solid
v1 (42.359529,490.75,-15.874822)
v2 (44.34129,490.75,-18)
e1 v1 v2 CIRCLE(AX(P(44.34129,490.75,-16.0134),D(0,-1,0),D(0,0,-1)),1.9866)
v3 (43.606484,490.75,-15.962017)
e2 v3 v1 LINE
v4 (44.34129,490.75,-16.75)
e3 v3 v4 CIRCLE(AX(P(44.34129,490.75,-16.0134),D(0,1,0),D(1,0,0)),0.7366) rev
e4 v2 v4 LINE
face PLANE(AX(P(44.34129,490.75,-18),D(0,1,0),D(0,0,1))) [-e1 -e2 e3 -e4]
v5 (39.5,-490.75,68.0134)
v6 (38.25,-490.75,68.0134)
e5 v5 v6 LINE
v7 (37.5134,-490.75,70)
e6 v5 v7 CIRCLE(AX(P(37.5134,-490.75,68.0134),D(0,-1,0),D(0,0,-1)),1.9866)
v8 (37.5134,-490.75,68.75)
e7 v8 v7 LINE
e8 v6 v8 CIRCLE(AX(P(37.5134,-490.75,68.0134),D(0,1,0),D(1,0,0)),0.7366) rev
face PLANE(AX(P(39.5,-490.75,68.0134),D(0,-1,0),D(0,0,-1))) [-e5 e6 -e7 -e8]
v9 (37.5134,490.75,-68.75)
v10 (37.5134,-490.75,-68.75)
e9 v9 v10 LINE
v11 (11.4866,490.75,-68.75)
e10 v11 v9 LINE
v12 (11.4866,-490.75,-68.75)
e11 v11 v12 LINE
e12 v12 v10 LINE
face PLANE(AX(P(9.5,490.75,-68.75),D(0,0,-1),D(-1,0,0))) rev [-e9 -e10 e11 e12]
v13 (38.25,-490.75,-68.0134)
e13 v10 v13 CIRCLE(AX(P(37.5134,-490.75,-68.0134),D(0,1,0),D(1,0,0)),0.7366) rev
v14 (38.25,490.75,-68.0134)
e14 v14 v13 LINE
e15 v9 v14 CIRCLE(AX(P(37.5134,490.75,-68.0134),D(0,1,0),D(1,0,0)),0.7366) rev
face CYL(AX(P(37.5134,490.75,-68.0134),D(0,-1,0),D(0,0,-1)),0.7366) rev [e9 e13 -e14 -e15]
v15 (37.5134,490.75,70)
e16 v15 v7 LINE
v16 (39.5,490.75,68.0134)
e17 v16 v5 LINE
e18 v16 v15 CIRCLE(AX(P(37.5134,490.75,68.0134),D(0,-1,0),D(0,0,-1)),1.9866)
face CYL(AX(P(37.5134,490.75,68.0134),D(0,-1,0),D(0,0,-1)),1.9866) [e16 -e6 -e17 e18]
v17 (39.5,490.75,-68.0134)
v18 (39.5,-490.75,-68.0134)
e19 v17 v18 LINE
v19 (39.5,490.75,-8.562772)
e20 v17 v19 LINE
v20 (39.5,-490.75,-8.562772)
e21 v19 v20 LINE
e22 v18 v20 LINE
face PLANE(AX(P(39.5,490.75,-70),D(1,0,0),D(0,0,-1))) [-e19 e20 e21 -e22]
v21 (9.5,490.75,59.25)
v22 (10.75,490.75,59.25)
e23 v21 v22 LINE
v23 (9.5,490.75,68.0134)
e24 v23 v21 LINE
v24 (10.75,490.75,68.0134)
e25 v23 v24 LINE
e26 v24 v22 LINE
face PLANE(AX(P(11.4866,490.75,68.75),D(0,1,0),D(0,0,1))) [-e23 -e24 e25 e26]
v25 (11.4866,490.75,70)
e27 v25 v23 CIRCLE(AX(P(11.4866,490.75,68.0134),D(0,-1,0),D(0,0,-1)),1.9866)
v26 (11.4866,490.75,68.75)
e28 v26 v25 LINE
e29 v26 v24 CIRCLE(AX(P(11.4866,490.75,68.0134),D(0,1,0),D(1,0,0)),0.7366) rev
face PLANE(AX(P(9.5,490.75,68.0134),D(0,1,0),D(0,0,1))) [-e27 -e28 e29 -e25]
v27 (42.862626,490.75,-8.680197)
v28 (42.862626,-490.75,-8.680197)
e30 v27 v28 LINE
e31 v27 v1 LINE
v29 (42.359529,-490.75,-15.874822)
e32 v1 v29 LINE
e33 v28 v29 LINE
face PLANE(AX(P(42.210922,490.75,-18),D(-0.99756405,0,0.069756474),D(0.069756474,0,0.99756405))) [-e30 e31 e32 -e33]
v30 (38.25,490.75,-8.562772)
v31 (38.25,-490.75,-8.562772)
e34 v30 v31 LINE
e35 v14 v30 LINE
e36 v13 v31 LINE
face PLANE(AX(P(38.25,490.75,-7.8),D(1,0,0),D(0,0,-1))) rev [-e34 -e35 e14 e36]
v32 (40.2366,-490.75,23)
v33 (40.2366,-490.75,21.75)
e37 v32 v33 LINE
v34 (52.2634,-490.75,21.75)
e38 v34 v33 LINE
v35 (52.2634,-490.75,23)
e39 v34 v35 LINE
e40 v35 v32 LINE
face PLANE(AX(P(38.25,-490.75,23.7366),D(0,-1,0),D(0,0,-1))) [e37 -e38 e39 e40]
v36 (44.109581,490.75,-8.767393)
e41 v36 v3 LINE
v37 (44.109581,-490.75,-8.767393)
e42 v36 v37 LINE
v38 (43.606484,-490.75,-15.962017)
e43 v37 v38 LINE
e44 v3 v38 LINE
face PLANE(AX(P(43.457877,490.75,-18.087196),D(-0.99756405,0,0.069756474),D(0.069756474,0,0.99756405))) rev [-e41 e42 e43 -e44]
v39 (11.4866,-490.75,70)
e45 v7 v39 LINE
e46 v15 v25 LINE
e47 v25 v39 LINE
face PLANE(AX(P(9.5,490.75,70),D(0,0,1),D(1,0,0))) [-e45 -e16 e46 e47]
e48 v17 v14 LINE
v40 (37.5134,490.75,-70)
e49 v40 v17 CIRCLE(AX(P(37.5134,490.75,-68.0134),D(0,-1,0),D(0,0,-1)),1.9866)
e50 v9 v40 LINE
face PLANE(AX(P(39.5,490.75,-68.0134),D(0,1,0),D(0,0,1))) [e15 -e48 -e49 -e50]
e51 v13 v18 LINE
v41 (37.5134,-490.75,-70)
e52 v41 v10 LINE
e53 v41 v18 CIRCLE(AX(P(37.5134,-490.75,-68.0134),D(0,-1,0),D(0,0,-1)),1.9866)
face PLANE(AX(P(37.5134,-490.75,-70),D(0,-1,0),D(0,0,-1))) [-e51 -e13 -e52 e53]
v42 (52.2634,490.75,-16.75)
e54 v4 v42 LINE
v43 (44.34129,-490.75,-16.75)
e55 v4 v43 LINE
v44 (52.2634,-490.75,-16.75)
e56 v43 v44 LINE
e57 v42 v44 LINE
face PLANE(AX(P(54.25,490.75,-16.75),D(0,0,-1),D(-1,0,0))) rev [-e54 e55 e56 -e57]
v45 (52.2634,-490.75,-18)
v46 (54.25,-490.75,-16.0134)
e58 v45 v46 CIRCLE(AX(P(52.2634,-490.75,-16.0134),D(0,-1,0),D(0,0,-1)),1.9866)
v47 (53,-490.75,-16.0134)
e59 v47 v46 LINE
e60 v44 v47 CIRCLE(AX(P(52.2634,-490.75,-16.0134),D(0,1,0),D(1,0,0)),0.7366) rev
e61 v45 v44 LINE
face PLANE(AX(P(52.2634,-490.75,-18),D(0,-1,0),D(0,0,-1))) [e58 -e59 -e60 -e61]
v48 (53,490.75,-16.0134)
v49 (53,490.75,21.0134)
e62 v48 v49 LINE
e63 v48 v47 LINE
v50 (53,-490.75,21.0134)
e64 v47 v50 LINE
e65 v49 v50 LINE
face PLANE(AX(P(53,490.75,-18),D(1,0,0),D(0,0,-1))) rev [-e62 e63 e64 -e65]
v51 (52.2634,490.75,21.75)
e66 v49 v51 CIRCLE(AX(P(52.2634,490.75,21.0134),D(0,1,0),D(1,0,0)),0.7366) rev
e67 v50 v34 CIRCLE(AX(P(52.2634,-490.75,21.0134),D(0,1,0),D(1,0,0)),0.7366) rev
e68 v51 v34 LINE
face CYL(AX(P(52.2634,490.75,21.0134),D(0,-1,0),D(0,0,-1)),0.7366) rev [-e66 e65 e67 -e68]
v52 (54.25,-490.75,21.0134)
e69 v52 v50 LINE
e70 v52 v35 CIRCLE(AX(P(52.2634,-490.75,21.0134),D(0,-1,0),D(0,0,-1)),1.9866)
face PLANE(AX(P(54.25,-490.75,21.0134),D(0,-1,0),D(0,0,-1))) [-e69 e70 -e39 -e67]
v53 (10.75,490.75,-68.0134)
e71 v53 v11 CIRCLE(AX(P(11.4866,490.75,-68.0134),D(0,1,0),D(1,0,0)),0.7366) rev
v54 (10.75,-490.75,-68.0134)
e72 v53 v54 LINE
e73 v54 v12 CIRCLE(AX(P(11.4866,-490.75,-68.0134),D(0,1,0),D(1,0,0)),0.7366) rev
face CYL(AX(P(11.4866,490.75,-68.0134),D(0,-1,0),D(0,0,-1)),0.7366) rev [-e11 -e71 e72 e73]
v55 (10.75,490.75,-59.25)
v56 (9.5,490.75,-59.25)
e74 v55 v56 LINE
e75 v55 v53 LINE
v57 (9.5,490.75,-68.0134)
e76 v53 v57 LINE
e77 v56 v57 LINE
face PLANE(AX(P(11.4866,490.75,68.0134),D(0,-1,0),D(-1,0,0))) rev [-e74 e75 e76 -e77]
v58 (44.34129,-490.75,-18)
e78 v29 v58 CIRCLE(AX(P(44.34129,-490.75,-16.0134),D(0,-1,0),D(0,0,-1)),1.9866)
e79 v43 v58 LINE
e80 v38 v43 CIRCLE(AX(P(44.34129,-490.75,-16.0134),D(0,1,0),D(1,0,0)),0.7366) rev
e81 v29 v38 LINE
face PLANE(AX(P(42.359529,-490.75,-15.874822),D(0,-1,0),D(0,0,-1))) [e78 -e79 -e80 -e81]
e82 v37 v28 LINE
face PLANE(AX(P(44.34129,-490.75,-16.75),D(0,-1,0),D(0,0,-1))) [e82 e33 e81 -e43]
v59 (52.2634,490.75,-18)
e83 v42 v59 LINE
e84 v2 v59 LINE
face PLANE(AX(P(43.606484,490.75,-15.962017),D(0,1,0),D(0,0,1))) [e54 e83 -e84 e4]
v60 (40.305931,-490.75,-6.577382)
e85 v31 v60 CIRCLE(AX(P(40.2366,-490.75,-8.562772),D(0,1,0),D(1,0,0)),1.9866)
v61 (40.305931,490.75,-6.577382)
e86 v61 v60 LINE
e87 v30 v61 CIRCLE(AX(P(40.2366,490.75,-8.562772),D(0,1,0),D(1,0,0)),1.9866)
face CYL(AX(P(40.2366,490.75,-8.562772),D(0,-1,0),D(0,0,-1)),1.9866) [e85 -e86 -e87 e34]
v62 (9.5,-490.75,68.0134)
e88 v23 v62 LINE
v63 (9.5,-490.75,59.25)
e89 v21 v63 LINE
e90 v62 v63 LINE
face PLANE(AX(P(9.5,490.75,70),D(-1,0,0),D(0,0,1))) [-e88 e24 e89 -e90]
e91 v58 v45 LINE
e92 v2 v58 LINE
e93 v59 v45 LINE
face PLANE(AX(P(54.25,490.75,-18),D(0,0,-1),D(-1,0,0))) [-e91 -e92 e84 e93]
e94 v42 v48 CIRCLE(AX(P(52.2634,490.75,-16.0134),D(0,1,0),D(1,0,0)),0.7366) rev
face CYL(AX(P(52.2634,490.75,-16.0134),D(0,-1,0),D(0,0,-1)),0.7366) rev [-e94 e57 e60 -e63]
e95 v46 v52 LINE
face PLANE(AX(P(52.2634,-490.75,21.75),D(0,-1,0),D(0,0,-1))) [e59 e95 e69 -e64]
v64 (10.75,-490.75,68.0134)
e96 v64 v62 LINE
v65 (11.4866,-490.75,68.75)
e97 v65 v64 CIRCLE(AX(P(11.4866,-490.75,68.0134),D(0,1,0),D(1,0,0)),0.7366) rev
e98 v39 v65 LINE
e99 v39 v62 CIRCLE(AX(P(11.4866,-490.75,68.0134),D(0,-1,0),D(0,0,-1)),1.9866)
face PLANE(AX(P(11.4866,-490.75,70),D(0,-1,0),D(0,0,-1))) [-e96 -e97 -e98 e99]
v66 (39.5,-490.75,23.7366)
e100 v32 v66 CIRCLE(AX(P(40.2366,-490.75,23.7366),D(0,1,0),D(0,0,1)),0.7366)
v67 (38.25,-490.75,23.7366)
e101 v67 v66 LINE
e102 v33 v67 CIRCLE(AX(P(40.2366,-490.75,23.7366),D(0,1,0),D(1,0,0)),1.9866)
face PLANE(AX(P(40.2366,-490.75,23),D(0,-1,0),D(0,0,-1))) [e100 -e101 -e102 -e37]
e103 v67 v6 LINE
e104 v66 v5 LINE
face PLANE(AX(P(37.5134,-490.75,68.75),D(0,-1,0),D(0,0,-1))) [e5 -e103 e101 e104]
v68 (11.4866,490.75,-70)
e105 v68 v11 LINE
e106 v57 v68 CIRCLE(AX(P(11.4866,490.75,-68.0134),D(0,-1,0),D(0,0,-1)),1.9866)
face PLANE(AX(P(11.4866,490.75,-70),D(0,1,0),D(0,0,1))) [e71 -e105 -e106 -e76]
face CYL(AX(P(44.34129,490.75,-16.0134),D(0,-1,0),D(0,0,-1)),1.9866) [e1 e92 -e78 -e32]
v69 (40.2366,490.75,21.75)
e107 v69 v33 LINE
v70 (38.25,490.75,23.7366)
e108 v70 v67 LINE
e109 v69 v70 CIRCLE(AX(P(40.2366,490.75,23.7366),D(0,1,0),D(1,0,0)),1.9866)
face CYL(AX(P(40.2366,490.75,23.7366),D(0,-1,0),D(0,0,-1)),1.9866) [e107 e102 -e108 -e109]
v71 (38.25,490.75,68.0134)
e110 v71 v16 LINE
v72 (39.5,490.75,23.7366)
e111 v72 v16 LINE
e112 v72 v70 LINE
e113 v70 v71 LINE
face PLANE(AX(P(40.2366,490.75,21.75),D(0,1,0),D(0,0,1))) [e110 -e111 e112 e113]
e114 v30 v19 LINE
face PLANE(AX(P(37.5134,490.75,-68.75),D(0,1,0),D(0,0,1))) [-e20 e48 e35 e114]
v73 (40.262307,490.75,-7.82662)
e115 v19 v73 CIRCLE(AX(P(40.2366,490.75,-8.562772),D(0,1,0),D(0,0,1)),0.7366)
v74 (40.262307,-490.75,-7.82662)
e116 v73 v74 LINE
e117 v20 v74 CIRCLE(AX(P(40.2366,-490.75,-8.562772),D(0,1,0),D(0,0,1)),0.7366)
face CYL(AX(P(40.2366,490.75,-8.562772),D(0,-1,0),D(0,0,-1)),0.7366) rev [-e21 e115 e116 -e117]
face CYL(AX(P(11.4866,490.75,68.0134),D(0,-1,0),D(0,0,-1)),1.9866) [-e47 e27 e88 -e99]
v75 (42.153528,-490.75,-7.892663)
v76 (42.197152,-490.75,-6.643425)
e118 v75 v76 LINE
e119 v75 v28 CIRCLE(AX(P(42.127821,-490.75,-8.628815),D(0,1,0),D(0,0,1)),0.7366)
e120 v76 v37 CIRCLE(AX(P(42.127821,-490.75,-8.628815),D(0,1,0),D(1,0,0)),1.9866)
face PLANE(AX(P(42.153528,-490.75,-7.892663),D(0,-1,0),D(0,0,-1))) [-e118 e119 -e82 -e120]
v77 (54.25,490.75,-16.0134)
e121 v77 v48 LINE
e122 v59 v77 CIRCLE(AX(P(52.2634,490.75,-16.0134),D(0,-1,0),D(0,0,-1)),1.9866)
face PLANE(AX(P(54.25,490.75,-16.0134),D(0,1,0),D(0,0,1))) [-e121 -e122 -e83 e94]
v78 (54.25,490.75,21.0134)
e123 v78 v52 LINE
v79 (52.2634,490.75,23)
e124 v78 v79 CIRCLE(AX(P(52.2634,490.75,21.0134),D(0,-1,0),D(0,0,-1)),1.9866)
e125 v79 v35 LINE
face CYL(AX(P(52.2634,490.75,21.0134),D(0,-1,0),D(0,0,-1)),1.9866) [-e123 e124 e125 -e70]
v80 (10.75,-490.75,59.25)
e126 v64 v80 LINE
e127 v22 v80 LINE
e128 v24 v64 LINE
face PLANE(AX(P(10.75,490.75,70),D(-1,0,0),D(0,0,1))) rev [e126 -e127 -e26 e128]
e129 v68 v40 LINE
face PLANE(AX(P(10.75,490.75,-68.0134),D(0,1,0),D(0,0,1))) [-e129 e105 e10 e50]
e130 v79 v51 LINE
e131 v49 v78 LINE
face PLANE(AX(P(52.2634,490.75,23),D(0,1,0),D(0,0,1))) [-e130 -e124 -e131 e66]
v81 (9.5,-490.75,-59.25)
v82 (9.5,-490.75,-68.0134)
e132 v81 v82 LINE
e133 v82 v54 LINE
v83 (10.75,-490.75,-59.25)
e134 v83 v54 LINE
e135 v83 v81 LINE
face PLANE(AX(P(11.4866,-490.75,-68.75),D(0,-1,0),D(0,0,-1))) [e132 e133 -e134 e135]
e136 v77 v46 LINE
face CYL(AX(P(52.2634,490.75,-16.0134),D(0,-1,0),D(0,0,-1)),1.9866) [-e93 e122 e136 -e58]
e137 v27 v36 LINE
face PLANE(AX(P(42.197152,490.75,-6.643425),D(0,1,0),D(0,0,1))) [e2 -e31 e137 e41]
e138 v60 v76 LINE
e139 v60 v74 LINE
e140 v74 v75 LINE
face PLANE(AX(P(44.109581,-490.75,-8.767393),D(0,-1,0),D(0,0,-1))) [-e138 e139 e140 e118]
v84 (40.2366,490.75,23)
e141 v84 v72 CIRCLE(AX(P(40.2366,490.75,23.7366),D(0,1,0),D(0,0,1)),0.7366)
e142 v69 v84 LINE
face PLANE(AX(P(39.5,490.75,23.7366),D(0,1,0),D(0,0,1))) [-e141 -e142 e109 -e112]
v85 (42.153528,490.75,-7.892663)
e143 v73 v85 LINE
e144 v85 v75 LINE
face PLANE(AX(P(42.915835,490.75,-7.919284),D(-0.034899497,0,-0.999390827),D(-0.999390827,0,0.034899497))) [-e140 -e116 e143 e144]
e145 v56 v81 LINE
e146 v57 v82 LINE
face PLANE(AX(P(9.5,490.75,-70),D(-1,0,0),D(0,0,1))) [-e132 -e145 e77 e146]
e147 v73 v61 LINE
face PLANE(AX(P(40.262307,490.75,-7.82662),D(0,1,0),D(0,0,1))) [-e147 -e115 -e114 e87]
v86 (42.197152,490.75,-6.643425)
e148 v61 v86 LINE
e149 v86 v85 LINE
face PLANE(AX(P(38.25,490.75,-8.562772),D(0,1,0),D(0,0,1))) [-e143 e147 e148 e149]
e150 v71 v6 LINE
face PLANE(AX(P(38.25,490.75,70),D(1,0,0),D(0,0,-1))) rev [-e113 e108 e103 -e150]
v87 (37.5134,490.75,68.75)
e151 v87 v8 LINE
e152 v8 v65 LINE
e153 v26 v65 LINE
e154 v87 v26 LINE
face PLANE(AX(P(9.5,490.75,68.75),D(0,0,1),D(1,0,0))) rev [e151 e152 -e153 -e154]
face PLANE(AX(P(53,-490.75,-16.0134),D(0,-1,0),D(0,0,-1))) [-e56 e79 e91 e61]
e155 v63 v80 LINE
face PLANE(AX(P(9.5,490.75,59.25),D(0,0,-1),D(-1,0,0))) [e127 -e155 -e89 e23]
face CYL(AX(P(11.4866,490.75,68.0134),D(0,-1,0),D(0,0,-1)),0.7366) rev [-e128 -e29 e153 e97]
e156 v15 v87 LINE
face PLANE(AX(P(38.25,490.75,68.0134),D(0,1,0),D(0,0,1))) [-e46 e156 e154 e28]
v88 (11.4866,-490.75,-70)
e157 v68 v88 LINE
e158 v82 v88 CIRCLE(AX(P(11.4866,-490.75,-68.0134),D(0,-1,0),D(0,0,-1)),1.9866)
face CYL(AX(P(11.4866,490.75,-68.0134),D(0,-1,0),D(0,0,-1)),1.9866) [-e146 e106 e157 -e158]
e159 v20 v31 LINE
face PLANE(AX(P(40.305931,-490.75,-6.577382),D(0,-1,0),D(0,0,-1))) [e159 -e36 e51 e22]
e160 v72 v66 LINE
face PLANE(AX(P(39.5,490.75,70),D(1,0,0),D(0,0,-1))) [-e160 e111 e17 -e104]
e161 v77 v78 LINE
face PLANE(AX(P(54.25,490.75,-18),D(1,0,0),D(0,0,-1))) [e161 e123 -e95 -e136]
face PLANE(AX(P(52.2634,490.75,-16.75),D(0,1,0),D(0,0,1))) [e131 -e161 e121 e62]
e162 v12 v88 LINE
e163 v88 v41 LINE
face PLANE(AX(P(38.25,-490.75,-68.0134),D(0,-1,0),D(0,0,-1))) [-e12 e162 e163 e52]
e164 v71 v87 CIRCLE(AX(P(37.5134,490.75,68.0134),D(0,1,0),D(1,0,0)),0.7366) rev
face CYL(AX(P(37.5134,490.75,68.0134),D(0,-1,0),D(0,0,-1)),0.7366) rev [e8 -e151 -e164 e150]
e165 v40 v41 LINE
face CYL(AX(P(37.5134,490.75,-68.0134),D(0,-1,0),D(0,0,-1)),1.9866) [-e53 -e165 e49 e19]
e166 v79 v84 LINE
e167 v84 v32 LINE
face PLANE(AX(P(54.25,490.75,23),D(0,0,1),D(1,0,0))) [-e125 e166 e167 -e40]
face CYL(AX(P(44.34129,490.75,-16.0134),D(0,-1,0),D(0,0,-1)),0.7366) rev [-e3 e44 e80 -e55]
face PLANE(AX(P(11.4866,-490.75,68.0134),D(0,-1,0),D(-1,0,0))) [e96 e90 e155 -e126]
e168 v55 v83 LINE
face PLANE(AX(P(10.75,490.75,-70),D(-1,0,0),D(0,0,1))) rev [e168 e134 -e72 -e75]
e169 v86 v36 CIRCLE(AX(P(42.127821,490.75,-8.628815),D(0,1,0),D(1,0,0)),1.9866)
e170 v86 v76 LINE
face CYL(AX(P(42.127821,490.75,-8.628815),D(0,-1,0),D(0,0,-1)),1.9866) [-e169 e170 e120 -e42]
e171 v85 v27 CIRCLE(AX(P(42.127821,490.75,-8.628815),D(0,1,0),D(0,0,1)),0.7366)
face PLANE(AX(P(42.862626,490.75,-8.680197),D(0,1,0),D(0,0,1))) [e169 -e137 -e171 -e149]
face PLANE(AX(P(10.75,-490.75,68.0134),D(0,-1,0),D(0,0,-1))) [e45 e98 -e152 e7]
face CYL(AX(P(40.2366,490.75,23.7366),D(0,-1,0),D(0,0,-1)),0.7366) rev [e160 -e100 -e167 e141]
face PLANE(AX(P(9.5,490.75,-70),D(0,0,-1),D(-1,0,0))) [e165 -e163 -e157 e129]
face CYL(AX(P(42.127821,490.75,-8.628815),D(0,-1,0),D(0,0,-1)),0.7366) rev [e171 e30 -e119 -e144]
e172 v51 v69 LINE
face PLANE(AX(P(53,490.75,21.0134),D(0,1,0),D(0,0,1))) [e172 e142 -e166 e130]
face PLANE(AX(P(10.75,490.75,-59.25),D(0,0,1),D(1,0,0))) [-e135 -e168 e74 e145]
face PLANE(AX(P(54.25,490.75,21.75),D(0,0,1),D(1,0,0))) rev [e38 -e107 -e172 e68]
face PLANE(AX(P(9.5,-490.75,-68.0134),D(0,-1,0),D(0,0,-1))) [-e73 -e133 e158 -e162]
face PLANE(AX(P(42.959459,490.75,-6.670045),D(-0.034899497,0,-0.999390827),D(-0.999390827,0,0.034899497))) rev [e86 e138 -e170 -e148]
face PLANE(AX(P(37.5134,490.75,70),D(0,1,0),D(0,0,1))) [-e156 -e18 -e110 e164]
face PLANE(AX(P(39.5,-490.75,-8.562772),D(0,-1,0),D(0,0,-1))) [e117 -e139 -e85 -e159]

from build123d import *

# Parameters (mm, degrees)
BASE_FLANGE1_DEPTH = 490.75


# Sheet-metal steps are written as plain solids
with BuildPart() as part:
    # Sketch1 → Base-Flange1 (new, symmetric)
    with BuildSketch(Plane(origin=(0, 0, 0), x_dir=(1, 0, 0), z_dir=(0, 1, 0))):
        with BuildLine():
            Line((9.5, 59.25), (9.5, 68.0134))
            ThreePointArc((9.5, 68.0134), (10.081861668, 69.418138332), (11.4866, 70))
            Line((11.4866, 70), (37.5134, 70))
            ThreePointArc((37.5134, 70), (38.918138332, 69.418138332), (39.5, 68.0134))
            Line((39.5, 68.0134), (39.5, 23))
            Line((39.5, 23), (39.5, 8.562771629))
            ThreePointArc((39.5, 8.562771629), (39.724914644, 8.032905932), (40.262306969, 7.826620346))
            Line((40.262306969, 7.826620346), (42.153527557, 7.892663224))
            ThreePointArc((42.153527557, 7.892663224), (42.675221066, 8.135932903), (42.862626267, 8.680197126))
            Line((42.862626267, 8.680197126), (42.359529101, 15.874821789))
            ThreePointArc((42.359529101, 15.874821789), (42.88838258, 17.368257942), (44.341289843, 18))
            Line((44.341289843, 18), (52.2634, 18))
            ThreePointArc((52.2634, 18), (53.668138332, 17.418138332), (54.25, 16.0134))
            Line((54.25, 16.0134), (54.25, -21.0134))
            ThreePointArc((54.25, -21.0134), (53.668138332, -22.418138332), (52.2634, -23))
            Line((52.2634, -23), (40.2366, -23))
            ThreePointArc((40.2366, -23), (39.715745145, -23.215745145), (39.5, -23.7366))
            Line((39.5, -23.7366), (39.5, -68.0134))
            ThreePointArc((39.5, -68.0134), (38.918138332, -69.418138332), (37.5134, -70))
            Line((37.5134, -70), (11.4866, -70))
            ThreePointArc((11.4866, -70), (10.081861668, -69.418138332), (9.5, -68.0134))
            Line((9.5, -68.0134), (9.5, -59.25))
            Line((9.5, -59.25), (10.75, -59.25))
            Line((10.75, -59.25), (10.75, -68.0134))
            ThreePointArc((10.75, -68.0134), (10.965745145, -68.534254855), (11.4866, -68.75))
            Line((11.4866, -68.75), (37.5134, -68.75))
            ThreePointArc((37.5134, -68.75), (38.034254855, -68.534254855), (38.25, -68.0134))
            Line((38.25, -68.0134), (38.25, -23.7366))
            ThreePointArc((38.25, -23.7366), (38.831861668, -22.331861668), (40.2366, -21.75))
            Line((40.2366, -21.75), (52.2634, -21.75))
            ThreePointArc((52.2634, -21.75), (52.784254855, -21.534254855), (53, -21.0134))
            Line((53, -21.0134), (53, 16.0134))
            ThreePointArc((53, 16.0134), (52.784254855, 16.534254855), (52.2634, 16.75))
            Line((52.2634, 16.75), (44.341289843, 16.75))
            ThreePointArc((44.341289843, 16.75), (43.802574707, 16.515759992), (43.606484164, 15.962017381))
            Line((43.606484164, 15.962017381), (44.10958133, 8.767392718))
            ThreePointArc((44.10958133, 8.767392718), (43.604152098, 7.299519645), (42.197151928, 6.64342469))
            Line((42.197151928, 6.64342469), (40.30593134, 6.577381812))
            ThreePointArc((40.30593134, 6.577381812), (38.856591681, 7.133731182), (38.25, 8.562771629))
            Line((38.25, 8.562771629), (38.25, 23))
            Line((38.25, 23), (38.25, 68.0134))
            ThreePointArc((38.25, 68.0134), (38.034254855, 68.534254855), (37.5134, 68.75))
            Line((37.5134, 68.75), (11.4866, 68.75))
            ThreePointArc((11.4866, 68.75), (10.965745145, 68.534254855), (10.75, 68.0134))
            Line((10.75, 68.0134), (10.75, 59.25))
            Line((10.75, 59.25), (9.5, 59.25))
        make_face()
    extrude(amount=BASE_FLANGE1_DEPTH, both=True)


solid = part.part
